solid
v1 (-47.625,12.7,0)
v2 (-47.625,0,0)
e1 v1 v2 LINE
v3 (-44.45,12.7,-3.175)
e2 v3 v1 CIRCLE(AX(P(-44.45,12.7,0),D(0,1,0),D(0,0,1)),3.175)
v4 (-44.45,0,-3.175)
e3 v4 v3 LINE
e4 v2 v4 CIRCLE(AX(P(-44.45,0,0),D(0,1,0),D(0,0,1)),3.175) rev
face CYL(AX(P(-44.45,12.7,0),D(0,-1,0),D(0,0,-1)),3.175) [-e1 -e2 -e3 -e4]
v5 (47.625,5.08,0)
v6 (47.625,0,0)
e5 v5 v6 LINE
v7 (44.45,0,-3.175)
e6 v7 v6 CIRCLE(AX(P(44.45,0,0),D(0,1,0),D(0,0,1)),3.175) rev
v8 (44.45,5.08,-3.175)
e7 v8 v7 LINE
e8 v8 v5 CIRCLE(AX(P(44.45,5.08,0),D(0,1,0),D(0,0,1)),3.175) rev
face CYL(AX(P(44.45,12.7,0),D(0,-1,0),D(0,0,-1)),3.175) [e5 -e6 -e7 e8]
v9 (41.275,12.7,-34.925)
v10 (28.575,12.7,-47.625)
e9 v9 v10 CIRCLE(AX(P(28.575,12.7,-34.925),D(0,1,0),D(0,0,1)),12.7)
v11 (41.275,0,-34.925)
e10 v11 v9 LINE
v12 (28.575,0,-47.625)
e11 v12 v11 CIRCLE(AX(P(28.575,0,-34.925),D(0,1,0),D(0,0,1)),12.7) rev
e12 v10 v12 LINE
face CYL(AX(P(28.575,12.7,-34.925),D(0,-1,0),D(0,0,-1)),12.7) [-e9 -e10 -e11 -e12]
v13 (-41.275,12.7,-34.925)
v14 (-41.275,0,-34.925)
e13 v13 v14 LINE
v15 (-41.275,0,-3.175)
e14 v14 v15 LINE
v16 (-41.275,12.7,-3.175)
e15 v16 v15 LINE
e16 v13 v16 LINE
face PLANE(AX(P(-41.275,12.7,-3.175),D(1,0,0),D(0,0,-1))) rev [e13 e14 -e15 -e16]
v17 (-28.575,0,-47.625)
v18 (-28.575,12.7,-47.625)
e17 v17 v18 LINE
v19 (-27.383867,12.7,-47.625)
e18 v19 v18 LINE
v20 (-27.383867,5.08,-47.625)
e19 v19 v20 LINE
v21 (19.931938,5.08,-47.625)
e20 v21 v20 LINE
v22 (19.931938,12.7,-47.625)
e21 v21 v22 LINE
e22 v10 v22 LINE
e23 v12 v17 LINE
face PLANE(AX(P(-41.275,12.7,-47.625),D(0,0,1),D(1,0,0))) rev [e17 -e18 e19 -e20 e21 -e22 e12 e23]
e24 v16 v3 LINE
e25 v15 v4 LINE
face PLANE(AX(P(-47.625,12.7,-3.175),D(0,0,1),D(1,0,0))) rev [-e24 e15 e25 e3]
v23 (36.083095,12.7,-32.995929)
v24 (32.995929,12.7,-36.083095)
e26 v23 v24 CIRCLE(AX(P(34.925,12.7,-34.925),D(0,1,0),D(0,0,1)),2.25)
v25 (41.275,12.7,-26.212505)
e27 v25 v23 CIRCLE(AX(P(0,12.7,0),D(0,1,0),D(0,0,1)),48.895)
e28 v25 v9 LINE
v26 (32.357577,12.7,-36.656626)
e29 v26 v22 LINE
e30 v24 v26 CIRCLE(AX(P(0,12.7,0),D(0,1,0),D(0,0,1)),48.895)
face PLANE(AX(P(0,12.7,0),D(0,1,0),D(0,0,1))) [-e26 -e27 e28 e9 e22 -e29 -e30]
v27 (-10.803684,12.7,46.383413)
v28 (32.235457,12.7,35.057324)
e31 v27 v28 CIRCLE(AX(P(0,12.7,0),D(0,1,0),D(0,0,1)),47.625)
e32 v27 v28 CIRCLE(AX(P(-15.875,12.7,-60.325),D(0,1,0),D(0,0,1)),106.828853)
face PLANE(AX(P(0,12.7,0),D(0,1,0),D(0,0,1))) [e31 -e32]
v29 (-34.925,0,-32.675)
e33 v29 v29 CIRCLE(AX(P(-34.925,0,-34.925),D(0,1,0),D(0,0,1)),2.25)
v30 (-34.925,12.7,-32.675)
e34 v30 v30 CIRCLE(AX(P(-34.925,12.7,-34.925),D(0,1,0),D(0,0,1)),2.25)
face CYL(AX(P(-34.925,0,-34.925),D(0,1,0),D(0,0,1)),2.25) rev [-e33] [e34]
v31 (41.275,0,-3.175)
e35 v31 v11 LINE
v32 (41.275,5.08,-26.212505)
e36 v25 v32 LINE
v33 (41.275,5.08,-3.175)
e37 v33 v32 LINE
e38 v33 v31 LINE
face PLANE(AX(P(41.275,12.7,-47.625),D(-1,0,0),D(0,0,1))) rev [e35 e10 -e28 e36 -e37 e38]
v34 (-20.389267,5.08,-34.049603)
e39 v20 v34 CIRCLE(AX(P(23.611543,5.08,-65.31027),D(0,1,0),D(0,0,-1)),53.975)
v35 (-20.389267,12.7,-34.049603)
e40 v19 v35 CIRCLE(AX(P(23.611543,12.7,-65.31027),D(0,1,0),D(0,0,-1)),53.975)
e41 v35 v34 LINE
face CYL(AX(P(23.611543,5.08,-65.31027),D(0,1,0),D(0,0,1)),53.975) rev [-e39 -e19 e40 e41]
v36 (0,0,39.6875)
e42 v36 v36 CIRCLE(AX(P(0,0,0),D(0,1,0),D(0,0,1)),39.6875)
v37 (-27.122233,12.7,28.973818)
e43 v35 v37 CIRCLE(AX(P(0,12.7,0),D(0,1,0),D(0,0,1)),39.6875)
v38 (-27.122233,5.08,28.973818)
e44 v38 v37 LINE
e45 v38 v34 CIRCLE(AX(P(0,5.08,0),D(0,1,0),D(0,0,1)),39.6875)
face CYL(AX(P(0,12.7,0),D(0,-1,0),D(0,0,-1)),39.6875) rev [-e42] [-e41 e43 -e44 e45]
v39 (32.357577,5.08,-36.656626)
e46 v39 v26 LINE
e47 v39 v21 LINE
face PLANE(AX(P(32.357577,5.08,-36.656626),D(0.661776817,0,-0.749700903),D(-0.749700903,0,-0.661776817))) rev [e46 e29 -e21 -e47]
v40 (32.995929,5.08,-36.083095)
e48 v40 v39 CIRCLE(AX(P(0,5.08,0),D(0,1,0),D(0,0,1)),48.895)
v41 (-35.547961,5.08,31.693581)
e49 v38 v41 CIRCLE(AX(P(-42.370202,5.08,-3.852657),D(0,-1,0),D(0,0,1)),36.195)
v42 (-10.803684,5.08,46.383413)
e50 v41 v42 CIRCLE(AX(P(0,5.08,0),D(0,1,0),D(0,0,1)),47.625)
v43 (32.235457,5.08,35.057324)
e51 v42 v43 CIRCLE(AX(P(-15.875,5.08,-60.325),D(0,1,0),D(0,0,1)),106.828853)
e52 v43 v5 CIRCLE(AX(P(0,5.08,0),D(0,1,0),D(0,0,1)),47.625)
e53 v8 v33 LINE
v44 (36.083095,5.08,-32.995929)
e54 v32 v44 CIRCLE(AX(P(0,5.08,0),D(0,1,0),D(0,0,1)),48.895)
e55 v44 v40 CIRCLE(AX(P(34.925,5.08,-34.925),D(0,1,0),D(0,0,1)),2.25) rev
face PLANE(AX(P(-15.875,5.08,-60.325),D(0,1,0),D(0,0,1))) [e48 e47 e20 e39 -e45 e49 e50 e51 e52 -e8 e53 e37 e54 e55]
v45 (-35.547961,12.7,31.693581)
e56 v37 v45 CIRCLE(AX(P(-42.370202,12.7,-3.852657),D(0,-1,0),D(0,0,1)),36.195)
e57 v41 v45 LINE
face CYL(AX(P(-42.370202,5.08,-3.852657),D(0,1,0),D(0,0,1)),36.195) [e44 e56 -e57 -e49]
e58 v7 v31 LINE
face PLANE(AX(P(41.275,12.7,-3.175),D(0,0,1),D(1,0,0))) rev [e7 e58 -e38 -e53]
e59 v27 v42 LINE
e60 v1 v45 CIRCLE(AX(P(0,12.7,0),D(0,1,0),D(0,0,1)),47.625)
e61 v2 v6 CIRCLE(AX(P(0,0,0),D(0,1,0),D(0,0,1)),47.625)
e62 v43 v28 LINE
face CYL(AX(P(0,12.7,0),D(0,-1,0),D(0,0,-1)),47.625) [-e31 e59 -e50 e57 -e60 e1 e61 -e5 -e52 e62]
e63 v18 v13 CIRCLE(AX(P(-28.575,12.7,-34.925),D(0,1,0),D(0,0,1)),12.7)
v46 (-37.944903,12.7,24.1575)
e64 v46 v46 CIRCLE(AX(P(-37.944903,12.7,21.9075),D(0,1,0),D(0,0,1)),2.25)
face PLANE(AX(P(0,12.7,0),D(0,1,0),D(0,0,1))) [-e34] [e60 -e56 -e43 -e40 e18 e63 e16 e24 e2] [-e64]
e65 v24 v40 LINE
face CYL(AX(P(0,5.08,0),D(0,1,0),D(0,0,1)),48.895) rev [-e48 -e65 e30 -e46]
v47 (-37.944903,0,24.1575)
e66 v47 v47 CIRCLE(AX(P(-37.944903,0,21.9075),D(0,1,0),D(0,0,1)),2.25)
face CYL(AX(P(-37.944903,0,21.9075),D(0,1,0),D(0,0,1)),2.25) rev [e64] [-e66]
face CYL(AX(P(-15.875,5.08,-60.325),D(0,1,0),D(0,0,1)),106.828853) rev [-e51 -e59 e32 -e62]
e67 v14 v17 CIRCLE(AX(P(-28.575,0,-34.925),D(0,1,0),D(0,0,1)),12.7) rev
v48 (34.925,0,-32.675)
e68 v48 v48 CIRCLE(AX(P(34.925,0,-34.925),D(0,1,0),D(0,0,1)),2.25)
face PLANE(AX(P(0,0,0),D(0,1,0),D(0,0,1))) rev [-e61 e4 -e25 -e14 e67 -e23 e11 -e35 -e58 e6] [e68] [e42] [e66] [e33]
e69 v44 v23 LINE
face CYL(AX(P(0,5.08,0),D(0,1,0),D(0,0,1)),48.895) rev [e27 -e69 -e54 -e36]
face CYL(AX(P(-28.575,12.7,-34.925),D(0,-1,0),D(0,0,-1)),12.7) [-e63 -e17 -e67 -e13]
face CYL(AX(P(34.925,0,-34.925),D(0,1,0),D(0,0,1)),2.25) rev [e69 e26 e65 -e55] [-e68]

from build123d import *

# Parameters (mm, degrees)
SKETCH1_R           = 39.6875
BOSS_EXTRUDE1_DEPTH = 12.7
FILLET1_R           = 12.7
FILLET2_R           = 3.175
SKETCH2_R           = 2.25
CUT_EXTRUDE1_DEPTH  = 69.538830235
CUT_EXTRUDE2_DEPTH  = 7.62
SKETCH9_R           = 2.25
CUT_EXTRUDE3_DEPTH  = 69.538830235


with BuildPart() as part:
    # Sketch1 → Boss-Extrude1 (new body)
    with BuildSketch(Plane(origin=(0, 0, 0), x_dir=(1, 0, 0), z_dir=(0, 1, 0))):
        with BuildLine():
            Line((-47.625, 0), (-47.625, 3.175))
            Line((-47.625, 3.175), (-41.275, 3.175))
            Line((-41.275, 3.175), (-41.275, 47.625))
            Line((-41.275, 47.625), (41.275, 47.625))
            Line((41.275, 47.625), (41.275, 3.175))
            Line((41.275, 3.175), (47.625, 3.175))
            Line((47.625, 3.175), (47.625, 0))
            ThreePointArc((47.625, 0), (0, -47.625), (-47.625, 0))
        make_face()
        with Locations(Location((0, 0, 0), (0, 0, 270))):
            Circle(SKETCH1_R, mode=Mode.SUBTRACT)
    extrude(amount=BOSS_EXTRUDE1_DEPTH)

    # Fillet1
    fillet1_edges = [part.edges().sort_by_distance(p)[0] for p in [
        (-41.275, 6.35, -47.625),
        (41.275, 6.35, -47.625),
    ]]
    fillet(fillet1_edges, radius=FILLET1_R)

    # Fillet2
    fillet2_edges = [part.edges().sort_by_distance(p)[0] for p in [
        (47.625, 6.35, -3.175),
        (-47.625, 6.35, -3.175),
    ]]
    fillet(fillet2_edges, radius=FILLET2_R - 0.0001)  # a hair under: the kernel refuses the full size

    # Sketch2 → Cut-Extrude1 (cut, through all)
    with BuildSketch(Plane(origin=(0, 12.7, 0), x_dir=(1, 0, 0), z_dir=(0, 1, 0))):
        with Locations(Location((-34.925, 34.925, 0), (0, 0, 270))):
            Circle(SKETCH2_R)
        with Locations(Location((34.925, 34.925, 0), (0, 0, 270))):
            Circle(SKETCH2_R)
    extrude(amount=-CUT_EXTRUDE1_DEPTH, mode=Mode.SUBTRACT)

    # Sketch6 → Cut-Extrude2 (cut)
    with BuildSketch(Plane(origin=(0, 12.7, 0), x_dir=(1, 0, 0), z_dir=(0, 1, 0))):
        with BuildLine():
            Line((-49.187681697, -31.694494567), (-48.884558606, -41.276047168))
            ThreePointArc((-48.884558606, -41.276047168), (-5.562483374, -46.004938144), (36.043462017, -33.039217165))
            ThreePointArc((36.043462017, -33.039217165), (48.826767021, 2.582217505), (32.357577485, 36.656625654))
            Line((32.357577485, 36.656625654), (-25.491069939, 87.720848233))
            ThreePointArc((-25.491069939, 87.720848233), (-29.666518146, 56.664530057), (-15.884572215, 28.522262332))
            ThreePointArc((-15.884572215, 28.522262332), (-10.696498958, -13.664606553), (-49.187681697, -31.694494567))
        make_face()
    extrude(amount=-CUT_EXTRUDE2_DEPTH, mode=Mode.SUBTRACT)

    # Sketch9 → Cut-Extrude3 (cut, through all)
    with BuildSketch(Plane(origin=(0, 12.7, 0), x_dir=(1, 0, 0), z_dir=(0, 1, 0))):
        with Locations(Location((-37.944903067, -21.9075, 0), (0, 0, 270))):
            Circle(SKETCH9_R)
    extrude(amount=-CUT_EXTRUDE3_DEPTH, mode=Mode.SUBTRACT)


solid = part.part
